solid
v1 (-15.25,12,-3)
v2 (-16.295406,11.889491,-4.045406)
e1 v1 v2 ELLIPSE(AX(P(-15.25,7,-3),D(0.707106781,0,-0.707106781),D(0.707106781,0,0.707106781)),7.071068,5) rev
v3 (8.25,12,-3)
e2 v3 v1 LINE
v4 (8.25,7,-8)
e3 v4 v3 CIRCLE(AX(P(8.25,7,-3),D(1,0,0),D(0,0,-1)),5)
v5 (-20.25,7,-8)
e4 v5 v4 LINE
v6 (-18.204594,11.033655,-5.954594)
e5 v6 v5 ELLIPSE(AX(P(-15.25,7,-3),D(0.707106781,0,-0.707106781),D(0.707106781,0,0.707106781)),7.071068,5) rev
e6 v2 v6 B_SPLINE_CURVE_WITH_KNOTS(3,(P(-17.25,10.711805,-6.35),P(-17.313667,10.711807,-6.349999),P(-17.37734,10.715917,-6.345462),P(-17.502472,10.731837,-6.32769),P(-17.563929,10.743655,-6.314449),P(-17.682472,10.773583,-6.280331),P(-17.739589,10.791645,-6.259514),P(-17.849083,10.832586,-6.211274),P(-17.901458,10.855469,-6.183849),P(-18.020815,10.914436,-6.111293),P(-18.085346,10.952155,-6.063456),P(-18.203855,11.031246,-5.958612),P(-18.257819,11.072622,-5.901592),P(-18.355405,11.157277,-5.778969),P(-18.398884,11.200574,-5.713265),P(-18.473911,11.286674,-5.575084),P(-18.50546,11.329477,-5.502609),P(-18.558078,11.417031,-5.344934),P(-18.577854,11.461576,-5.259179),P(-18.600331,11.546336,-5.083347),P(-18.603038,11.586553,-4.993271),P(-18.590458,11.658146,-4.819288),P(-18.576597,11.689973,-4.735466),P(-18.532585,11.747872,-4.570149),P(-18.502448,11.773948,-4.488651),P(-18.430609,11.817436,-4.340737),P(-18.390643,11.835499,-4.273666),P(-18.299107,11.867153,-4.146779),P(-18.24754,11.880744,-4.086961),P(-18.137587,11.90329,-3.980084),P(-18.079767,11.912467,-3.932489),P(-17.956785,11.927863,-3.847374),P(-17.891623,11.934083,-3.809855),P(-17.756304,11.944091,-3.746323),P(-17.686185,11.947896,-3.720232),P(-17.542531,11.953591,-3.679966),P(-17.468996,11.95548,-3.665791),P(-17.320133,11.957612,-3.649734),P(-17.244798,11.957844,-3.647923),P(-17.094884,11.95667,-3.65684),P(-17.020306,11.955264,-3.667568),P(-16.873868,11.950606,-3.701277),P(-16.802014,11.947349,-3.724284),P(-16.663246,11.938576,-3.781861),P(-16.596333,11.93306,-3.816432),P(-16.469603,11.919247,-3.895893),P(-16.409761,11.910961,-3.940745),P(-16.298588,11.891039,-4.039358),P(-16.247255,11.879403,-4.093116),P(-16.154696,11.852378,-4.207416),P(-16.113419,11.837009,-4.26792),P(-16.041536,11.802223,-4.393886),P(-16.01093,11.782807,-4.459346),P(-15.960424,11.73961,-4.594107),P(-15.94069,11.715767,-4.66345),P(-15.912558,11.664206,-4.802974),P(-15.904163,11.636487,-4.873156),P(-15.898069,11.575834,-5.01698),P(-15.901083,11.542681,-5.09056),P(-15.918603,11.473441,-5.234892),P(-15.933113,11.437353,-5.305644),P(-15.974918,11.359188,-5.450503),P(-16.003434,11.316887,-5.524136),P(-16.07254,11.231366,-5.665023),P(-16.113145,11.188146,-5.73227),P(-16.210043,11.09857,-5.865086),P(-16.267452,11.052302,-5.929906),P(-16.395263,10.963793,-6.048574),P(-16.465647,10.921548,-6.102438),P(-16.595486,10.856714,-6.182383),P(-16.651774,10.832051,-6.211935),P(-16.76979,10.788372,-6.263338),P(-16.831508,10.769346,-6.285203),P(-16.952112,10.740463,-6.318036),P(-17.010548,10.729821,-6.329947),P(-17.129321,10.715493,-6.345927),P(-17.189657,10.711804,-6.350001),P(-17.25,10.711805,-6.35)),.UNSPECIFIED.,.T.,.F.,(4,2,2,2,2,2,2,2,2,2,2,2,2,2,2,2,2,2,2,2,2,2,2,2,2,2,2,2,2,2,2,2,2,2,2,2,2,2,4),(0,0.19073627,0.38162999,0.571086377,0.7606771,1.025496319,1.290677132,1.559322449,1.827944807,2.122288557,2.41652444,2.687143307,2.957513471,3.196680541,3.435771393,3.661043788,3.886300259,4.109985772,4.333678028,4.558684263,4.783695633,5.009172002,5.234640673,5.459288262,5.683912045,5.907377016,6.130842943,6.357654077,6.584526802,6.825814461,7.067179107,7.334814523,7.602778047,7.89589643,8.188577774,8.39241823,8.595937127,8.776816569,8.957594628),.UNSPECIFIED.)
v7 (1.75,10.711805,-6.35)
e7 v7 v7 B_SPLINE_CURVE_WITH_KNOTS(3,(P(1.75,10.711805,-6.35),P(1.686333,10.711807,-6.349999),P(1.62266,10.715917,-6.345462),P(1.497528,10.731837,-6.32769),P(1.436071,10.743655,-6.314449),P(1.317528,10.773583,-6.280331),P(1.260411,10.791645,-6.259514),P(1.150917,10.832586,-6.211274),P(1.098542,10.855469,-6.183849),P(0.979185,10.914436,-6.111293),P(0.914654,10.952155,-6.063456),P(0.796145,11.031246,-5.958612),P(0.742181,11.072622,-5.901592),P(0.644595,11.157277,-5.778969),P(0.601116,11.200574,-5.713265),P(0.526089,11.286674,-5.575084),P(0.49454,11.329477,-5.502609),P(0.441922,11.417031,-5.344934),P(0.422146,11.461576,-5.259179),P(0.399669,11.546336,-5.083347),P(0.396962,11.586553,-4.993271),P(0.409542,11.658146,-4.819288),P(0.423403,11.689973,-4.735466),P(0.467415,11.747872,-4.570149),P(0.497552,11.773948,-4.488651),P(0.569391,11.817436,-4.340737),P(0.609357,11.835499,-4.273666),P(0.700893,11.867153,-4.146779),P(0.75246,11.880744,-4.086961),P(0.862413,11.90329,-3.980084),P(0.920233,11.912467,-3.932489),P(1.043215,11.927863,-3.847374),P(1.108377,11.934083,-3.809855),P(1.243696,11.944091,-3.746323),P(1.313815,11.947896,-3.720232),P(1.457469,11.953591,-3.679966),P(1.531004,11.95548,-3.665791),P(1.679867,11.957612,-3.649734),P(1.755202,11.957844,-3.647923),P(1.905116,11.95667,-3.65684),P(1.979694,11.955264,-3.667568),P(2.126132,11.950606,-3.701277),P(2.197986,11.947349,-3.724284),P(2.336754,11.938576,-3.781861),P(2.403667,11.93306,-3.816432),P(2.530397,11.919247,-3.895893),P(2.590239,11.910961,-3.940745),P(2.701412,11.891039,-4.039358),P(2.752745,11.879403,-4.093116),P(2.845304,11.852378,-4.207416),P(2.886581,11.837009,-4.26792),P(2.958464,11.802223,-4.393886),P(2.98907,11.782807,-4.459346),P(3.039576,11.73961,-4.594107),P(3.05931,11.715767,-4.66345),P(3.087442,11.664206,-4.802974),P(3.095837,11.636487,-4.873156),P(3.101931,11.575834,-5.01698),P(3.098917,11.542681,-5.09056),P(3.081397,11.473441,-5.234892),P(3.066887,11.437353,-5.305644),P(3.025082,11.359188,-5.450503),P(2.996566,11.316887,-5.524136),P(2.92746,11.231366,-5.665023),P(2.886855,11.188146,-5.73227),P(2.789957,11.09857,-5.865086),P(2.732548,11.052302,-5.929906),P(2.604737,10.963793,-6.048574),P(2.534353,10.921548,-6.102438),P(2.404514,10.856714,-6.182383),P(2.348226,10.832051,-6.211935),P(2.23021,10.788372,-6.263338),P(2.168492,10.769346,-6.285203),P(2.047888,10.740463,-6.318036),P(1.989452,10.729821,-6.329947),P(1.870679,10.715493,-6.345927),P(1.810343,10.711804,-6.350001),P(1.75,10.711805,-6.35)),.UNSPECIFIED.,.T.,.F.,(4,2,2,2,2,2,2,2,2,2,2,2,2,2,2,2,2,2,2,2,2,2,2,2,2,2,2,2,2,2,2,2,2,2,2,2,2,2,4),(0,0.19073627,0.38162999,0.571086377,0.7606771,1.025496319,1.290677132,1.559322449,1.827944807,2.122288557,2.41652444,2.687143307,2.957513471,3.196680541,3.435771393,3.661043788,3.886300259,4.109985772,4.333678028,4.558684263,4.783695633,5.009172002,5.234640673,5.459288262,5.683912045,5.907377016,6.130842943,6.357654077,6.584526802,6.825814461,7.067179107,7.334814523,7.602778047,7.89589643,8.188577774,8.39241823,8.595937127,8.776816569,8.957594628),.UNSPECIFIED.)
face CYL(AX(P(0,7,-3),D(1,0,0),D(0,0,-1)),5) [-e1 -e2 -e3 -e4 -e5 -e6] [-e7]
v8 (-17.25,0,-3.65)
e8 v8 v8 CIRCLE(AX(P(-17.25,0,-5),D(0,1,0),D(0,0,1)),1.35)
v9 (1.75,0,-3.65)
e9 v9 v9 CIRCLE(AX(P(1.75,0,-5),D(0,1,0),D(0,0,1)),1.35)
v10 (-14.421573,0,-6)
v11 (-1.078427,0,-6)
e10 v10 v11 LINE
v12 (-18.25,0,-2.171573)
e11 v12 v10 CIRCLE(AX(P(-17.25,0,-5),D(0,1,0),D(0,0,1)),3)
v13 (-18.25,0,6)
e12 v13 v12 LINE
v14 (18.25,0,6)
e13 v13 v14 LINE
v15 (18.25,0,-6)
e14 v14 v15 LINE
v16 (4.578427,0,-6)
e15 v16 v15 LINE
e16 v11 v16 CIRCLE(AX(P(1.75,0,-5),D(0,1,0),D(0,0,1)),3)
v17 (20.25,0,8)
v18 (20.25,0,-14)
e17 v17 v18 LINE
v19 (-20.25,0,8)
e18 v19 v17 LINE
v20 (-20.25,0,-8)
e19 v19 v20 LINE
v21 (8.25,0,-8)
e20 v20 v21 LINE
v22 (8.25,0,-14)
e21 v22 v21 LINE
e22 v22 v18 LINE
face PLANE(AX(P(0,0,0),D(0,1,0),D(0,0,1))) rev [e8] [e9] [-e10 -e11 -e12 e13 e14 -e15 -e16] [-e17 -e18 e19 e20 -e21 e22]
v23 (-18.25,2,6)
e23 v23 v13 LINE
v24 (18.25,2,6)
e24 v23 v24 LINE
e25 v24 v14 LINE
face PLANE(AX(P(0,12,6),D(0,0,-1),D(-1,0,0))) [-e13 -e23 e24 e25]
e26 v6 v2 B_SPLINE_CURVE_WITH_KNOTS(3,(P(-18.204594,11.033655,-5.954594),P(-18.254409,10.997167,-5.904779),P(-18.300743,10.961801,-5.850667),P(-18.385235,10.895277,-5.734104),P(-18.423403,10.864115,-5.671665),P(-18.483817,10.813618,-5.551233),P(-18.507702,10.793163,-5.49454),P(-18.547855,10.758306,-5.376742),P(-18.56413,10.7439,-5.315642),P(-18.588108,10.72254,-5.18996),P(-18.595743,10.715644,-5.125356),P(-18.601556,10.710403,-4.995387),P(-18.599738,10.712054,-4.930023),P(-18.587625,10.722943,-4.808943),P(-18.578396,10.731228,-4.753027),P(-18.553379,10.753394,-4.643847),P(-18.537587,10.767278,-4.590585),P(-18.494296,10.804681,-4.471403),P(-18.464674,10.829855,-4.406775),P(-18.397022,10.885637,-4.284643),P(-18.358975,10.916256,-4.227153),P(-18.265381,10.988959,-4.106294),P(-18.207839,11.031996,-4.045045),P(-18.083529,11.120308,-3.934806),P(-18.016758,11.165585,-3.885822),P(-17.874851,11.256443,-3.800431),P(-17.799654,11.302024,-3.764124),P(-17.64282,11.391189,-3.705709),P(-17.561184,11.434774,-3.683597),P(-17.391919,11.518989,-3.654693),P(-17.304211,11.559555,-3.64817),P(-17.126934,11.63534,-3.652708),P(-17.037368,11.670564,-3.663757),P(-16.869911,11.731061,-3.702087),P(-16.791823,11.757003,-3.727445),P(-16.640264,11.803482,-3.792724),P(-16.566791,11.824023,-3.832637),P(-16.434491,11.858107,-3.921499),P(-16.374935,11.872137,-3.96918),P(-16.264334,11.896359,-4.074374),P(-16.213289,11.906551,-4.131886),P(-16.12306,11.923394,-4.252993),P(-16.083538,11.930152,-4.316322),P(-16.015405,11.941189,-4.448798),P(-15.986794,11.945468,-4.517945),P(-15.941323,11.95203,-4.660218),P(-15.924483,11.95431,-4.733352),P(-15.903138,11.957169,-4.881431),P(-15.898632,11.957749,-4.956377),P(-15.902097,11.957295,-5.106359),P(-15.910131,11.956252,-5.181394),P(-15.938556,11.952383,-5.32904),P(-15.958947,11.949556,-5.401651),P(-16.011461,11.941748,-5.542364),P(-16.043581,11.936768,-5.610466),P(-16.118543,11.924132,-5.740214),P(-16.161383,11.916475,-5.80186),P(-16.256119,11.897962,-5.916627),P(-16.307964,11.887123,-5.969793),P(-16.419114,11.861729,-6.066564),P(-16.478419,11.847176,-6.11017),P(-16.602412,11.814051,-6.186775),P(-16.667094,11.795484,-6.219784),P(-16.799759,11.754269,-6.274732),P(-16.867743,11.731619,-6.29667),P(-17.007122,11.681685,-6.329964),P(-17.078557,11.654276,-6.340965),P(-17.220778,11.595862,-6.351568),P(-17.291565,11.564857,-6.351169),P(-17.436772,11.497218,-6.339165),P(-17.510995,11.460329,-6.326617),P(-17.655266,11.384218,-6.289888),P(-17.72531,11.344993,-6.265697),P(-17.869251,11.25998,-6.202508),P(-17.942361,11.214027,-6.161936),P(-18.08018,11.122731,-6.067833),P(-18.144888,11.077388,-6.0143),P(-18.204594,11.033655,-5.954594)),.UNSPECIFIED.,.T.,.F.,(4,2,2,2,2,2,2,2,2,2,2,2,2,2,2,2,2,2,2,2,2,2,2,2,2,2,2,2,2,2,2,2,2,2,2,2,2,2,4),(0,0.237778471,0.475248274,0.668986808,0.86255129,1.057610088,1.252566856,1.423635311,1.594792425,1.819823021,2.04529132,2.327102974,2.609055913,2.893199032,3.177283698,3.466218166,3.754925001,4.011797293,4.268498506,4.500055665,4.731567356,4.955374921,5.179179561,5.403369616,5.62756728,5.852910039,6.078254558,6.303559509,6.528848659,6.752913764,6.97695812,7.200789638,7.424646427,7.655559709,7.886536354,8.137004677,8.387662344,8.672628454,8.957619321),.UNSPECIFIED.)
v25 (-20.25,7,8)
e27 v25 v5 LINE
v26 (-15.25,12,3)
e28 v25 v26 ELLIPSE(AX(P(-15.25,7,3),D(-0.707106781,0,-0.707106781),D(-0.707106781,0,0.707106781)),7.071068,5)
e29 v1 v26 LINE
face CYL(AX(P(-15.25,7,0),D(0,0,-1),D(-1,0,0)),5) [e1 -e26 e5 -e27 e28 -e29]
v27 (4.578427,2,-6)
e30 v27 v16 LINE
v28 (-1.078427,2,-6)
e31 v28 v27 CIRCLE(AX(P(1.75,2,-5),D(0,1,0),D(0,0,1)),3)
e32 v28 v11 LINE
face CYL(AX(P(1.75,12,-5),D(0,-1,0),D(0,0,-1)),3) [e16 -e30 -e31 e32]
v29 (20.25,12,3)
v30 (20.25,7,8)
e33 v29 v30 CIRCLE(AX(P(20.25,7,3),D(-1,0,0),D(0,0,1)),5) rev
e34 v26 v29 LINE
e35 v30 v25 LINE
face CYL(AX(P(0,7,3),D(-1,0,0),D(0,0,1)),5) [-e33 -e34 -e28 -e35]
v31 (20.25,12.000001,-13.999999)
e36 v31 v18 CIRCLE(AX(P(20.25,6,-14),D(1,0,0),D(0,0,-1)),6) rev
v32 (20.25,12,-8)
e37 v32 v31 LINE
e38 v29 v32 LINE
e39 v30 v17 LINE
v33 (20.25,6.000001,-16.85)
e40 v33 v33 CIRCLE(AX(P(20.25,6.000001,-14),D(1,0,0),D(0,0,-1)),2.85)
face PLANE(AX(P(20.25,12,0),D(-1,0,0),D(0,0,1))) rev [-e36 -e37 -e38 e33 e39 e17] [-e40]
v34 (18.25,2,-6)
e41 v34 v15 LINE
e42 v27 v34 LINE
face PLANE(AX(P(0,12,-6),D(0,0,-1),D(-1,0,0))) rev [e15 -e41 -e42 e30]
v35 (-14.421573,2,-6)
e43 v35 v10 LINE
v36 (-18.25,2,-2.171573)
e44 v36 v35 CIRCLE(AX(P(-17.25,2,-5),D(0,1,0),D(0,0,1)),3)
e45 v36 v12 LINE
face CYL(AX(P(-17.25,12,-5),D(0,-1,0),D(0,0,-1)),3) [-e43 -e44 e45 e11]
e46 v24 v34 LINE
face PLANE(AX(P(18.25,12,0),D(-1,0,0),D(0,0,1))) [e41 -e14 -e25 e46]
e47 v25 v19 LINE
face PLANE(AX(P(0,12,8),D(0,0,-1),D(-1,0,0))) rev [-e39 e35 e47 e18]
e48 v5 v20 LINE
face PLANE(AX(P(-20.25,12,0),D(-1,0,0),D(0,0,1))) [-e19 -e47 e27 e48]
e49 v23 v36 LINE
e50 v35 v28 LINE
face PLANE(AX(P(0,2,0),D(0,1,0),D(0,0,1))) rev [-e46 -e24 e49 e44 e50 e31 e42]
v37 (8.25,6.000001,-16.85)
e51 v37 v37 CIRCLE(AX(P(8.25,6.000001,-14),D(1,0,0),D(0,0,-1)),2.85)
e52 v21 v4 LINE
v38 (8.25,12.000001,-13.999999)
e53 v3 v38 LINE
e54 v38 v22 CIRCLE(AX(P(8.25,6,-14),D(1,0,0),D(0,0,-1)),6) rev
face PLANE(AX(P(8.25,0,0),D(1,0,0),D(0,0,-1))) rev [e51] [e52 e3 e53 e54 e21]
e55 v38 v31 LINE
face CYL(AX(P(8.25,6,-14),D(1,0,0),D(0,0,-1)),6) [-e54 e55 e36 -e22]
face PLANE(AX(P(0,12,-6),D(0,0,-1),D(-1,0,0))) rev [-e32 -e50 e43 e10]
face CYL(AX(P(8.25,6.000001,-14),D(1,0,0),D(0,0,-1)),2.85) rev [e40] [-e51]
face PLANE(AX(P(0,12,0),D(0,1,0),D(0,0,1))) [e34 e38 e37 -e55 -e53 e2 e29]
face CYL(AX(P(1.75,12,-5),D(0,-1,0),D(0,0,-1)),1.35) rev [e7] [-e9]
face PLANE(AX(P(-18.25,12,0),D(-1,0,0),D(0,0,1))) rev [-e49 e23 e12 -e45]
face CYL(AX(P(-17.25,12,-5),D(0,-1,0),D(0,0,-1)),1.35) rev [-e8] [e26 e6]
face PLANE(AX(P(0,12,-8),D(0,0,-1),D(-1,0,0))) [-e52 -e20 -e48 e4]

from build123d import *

# Parameters (mm, degrees)
SKETCH1_W           = 40.5
SKETCH1_H           = 16
SKETCH1_R           = 1.35
BOSS_EXTRUDE1_DEPTH = 12
BOSS_EXTRUDE2_START = 2
BOSS_EXTRUDE2_DEPTH = 10
SKETCH3_R           = 2.85
BOSS_EXTRUDE3_DEPTH = 12
FILLET2_R           = 5


with BuildPart() as part:
    # Sketch1 → Boss-Extrude1 (new body)
    with BuildSketch(Plane(origin=(0, 0, 0), x_dir=(1, 0, 0), z_dir=(0, 1, 0))):
        Rectangle(SKETCH1_W, SKETCH1_H)
        with Locations(Location((-17.25, 5, 0), (0, 0, 270))):
            Circle(SKETCH1_R, mode=Mode.SUBTRACT)
        with BuildLine():
            Line((-14.421572875, 6), (-1.078427125, 6))
            ThreePointArc((-1.078427125, 6), (1.75, 2), (4.578427125, 6))
            Line((4.578427125, 6), (18.25, 6))
            Line((18.25, 6), (18.25, -6))
            Line((18.25, -6), (-18.25, -6))
            Line((-18.25, -6), (-18.25, 2.171572875))
            ThreePointArc((-18.25, 2.171572875), (-15.128679656, 2.878679656), (-14.421572875, 6))
        make_face(mode=Mode.SUBTRACT)
        with Locations(Location((1.75, 5, 0), (0, 0, 270))):
            Circle(SKETCH1_R, mode=Mode.SUBTRACT)
    extrude(amount=BOSS_EXTRUDE1_DEPTH)

    # Sketch1<3> → Boss-Extrude2 (add)
    with BuildSketch(Plane(origin=(0, 0, 0), x_dir=(1, 0, 0), z_dir=(0, 1, 0)).offset(BOSS_EXTRUDE2_START)):
        with BuildLine():
            ThreePointArc((-14.25, 5), (-15.517949192, 2.550510257), (-18.25, 2.171572875))
            Line((-18.25, 2.171572875), (-18.25, -6))
            Line((-18.25, -6), (18.25, -6))
            Line((18.25, -6), (18.25, 6))
            Line((18.25, 6), (4.578427125, 6))
            ThreePointArc((4.578427125, 6), (4.706795679, 5.507305936), (4.75, 5))
            ThreePointArc((4.75, 5), (1.242694064, 2.043204321), (-1.078427125, 6))
            Line((-1.078427125, 6), (-14.421572875, 6))
            ThreePointArc((-14.421572875, 6), (-14.293204321, 5.507305936), (-14.25, 5))
        make_face()
    extrude(amount=BOSS_EXTRUDE2_DEPTH)

    # Sketch3 → Boss-Extrude3 (add)
    with BuildSketch(Plane(origin=(20.25, 0, 0), x_dir=(0, 0, -1), z_dir=(1, 0, 0))):
        with BuildLine():
            ThreePointArc((13.999999499, 12.000000501), (20.00000025, 6.000000501), (14, 0))
            Line((14, 0), (8, 0))
            Line((8, 0), (8, 12))
            Line((8, 12), (13.999999499, 12.000000501))
        make_face()
        with Locations((14, 6.000000501)):
            Circle(SKETCH3_R, mode=Mode.SUBTRACT)
    extrude(amount=-BOSS_EXTRUDE3_DEPTH)

    # Fillet2
    # the kernel refuses this fillet: 5 mm, written as the material it takes off along each edge
    with BuildSketch(Plane(origin=(-20.25, 12, -20.5), x_dir=(1, 0, 0), z_dir=(0, 0, 1))) as fillet2_piece_1:
        with BuildLine():
            CenterArc((FILLET2_R, -FILLET2_R), FILLET2_R, 90, 90)
            Line((0, -FILLET2_R), (0, 0))
            Line((0, 0), (FILLET2_R, 0))
        make_face()
    extrude(amount=41, mode=Mode.SUBTRACT)
    with BuildSketch(Plane(origin=(8.25, 12, -8), x_dir=(0, -1, 0), z_dir=(-1, 0, 0))) as fillet2_piece_2:
        with BuildLine():
            CenterArc((FILLET2_R, FILLET2_R), FILLET2_R, 180, 90)
            Line((0, FILLET2_R), (0, 0))
            Line((0, 0), (FILLET2_R, 0))
        make_face()
    extrude(amount=41, mode=Mode.SUBTRACT)
    with BuildSketch(Plane(origin=(-32.75, 12, 8), x_dir=(0, -1, 0), z_dir=(1, 0, 0))) as fillet2_piece_3:
        with BuildLine():
            CenterArc((FILLET2_R, FILLET2_R), FILLET2_R, 180, 90)
            Line((0, FILLET2_R), (0, 0))
            Line((0, 0), (FILLET2_R, 0))
        make_face()
    extrude(amount=65.5, mode=Mode.SUBTRACT)


solid = part.part
